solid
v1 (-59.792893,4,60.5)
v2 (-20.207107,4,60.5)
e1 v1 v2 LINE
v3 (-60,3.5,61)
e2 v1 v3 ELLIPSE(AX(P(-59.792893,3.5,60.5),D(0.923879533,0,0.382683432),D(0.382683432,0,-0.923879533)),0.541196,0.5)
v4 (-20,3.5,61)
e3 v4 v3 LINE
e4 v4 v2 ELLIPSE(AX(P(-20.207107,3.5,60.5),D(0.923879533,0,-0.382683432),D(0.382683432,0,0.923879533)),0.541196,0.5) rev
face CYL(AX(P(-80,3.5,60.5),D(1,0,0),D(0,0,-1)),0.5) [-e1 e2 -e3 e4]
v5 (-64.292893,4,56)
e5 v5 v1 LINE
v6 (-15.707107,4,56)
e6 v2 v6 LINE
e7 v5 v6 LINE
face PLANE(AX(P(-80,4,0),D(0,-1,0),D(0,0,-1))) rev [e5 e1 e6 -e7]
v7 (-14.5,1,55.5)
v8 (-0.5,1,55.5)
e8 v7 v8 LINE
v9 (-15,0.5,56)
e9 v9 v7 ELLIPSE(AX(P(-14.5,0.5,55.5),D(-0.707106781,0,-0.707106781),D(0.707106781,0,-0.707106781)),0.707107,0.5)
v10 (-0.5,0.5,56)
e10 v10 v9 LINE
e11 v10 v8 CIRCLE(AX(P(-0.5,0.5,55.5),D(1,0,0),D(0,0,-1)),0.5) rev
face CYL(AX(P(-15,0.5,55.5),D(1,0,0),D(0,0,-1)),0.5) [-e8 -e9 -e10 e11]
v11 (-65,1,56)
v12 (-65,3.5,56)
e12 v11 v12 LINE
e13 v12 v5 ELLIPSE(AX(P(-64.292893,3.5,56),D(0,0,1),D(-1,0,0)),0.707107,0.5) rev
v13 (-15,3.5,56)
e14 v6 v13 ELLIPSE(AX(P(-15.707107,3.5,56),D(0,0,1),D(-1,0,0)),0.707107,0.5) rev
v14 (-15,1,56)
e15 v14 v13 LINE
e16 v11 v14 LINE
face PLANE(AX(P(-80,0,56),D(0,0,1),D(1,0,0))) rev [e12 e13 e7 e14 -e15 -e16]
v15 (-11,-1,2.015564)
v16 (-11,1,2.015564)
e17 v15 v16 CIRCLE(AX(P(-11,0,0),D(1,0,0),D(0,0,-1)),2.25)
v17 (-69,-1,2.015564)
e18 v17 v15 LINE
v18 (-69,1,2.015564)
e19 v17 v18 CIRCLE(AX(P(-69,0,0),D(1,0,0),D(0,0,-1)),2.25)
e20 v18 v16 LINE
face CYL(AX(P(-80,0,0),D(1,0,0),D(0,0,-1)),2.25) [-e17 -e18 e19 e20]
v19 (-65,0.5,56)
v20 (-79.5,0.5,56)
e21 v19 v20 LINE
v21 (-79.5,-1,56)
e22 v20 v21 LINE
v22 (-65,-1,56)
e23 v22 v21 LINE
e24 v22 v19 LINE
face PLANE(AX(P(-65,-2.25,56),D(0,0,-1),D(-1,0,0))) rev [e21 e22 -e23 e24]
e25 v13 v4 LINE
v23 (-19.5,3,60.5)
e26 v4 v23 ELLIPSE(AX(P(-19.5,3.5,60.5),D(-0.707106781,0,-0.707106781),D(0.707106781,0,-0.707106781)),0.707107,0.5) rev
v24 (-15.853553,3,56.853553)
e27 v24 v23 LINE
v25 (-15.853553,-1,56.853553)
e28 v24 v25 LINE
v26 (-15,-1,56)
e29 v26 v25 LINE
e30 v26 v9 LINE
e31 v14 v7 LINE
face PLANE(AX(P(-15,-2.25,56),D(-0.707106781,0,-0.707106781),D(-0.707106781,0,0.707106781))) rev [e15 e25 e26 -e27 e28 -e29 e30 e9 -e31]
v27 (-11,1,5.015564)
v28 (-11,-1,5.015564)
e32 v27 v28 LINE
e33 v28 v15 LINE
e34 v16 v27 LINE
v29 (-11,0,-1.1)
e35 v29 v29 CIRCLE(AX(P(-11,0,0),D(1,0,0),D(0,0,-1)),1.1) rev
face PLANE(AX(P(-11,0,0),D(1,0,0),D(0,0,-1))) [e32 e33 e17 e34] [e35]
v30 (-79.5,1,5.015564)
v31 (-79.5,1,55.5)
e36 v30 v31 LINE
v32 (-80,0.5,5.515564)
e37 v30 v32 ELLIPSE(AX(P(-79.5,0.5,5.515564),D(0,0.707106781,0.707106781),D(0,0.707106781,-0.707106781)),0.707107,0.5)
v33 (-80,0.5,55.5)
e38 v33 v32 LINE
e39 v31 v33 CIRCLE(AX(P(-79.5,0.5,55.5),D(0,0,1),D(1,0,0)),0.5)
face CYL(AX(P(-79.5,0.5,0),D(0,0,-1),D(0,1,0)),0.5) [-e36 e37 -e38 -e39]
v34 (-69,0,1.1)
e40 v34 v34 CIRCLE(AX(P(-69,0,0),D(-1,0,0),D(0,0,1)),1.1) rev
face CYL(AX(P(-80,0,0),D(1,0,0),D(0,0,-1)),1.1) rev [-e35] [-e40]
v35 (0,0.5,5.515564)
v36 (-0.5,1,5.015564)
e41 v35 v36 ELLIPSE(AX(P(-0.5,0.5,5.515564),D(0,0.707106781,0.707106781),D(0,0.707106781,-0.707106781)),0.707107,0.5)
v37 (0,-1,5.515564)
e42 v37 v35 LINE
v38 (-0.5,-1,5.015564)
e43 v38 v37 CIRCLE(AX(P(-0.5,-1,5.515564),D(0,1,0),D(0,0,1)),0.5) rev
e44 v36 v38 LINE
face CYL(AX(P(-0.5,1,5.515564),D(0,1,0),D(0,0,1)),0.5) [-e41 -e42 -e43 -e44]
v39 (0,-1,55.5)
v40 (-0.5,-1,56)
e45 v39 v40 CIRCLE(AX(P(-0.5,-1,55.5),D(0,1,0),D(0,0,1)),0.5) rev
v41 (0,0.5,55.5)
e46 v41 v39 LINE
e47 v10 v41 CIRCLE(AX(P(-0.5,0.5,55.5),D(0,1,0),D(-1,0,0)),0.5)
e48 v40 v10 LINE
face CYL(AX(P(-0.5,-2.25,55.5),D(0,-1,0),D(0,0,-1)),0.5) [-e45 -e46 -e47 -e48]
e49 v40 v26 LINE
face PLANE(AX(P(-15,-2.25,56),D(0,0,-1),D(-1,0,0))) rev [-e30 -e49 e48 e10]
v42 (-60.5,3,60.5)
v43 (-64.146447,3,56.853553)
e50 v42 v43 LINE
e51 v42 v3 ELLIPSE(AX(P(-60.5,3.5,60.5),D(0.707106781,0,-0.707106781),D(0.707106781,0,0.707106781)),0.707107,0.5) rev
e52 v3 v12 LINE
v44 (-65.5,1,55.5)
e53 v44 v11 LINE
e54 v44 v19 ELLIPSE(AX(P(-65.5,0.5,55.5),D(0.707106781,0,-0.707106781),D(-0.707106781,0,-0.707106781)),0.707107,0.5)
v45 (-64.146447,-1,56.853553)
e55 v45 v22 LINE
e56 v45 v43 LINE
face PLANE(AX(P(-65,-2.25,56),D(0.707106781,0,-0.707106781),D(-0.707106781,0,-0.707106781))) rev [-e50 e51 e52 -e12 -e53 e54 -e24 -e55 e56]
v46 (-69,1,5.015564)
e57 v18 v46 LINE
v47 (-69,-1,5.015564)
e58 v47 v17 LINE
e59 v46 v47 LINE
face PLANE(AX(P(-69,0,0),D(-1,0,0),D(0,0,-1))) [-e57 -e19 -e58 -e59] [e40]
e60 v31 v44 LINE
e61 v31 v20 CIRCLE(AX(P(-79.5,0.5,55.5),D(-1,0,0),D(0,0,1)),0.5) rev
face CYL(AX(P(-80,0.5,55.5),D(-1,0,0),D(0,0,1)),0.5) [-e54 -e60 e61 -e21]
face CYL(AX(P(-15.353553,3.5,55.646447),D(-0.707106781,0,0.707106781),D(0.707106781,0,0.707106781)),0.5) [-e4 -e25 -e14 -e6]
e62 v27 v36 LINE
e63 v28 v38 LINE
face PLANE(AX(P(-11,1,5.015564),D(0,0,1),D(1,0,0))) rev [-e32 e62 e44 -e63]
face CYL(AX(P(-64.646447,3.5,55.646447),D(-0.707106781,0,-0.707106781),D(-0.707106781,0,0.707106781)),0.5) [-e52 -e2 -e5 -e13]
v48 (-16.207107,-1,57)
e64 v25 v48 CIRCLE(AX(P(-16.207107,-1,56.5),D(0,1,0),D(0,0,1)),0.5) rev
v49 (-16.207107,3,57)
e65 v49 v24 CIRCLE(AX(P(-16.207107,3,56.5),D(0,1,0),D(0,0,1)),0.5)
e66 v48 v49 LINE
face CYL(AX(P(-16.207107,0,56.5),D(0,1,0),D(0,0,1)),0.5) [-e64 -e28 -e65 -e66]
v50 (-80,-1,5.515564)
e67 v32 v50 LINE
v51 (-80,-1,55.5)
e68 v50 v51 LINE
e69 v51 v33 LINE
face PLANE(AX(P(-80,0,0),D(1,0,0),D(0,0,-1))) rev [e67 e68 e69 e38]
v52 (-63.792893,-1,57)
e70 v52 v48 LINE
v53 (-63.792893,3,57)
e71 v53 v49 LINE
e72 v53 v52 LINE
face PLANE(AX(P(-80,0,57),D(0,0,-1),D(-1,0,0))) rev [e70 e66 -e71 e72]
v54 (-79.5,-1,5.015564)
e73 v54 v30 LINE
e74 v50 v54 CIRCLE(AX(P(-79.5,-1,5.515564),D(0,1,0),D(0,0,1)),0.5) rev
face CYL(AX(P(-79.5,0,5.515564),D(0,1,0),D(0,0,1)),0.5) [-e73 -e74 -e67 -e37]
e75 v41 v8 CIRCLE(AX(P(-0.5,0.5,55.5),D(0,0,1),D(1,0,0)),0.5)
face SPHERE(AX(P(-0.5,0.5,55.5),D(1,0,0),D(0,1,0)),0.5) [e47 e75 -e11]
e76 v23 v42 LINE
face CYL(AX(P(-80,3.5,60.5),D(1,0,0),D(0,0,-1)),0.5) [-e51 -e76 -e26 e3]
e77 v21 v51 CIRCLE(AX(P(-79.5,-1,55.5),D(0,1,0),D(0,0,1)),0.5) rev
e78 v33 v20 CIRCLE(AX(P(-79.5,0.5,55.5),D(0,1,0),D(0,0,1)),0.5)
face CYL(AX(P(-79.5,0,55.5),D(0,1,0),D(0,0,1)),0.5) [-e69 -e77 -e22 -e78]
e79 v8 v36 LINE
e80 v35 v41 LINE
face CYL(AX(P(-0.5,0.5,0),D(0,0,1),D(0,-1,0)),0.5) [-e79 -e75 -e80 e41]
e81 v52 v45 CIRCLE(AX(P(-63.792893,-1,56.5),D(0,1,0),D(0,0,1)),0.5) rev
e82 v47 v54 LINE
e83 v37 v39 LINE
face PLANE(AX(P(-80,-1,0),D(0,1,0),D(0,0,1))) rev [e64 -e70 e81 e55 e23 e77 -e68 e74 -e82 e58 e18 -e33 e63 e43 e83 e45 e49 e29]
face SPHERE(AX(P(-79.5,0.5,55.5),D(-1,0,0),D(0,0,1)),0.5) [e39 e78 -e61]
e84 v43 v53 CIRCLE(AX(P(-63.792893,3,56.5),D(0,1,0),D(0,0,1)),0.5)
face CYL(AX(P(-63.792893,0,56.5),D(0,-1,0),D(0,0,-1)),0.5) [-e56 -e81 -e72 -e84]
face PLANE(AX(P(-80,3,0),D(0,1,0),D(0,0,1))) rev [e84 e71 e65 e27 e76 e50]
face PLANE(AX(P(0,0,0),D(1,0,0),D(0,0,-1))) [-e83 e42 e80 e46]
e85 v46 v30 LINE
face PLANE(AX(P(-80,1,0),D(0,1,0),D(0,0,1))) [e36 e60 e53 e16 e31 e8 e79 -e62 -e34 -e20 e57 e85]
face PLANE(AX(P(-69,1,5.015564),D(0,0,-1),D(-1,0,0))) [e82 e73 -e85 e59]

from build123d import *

# Parameters (mm, degrees)
SKETCH2_R           = 1.1
BOSS_EXTRUDE1_DEPTH = 80
CUT_EXTRUDE1_START  = 40
CUT_EXTRUDE1_DEPTH  = 11
CUT_EXTRUDE2_DEPTH  = 101.797135376
FILLET1_R           = 0.5


with BuildPart() as part:
    # Sketch2 → Boss-Extrude1 (new body)
    with BuildSketch(Plane(origin=(0, 0, 0), x_dir=(0, 0, -1), z_dir=(1, 0, 0))):
        with BuildLine():
            ThreePointArc((-2.015564437, -1), (2.25, 0), (-2.015564437, 1))
            Line((-2.015564437, 1), (-56, 1))
            Line((-56, 1), (-56, 4))
            Line((-56, 4), (-61, 4))
            Line((-61, 4), (-61, 3))
            Line((-61, 3), (-57, 3))
            Line((-57, 3), (-57, 1))
            Line((-57, 1), (-57, -1))
            Line((-57, -1), (-2.015564437, -1))
        make_face()
        Circle(SKETCH2_R, mode=Mode.SUBTRACT)
    extrude(amount=-BOSS_EXTRUDE1_DEPTH)

    # Sketch5 → Cut-Extrude1 (cut)
    with BuildSketch(Plane(origin=(-40, 0, 0), x_dir=(0, 0, -1), z_dir=(1, 0, 0)).offset(CUT_EXTRUDE1_START)):
        with BuildLine():
            Line((-2.015564437, 1), (-5.015564437, 1))
            Line((-5.015564437, 1), (-5.015564437, -1))
            Line((-5.015564437, -1), (-2.015564437, -1))
            ThreePointArc((-2.015564437, -1), (2.25, 0), (-2.015564437, 1))
        make_face()
    cut_extrude1 = extrude(amount=-CUT_EXTRUDE1_DEPTH, mode=Mode.SUBTRACT)

    # Mirror1: Cut-Extrude1 across plane
    add(cut_extrude1.mirror(Plane(origin=(-40, 0, 0), x_dir=(0, 0, 1), z_dir=(1, 0, 0))), mode=Mode.SUBTRACT)

    # Sketch6 → Cut-Extrude2 (cut, through all)
    with BuildSketch(Plane(origin=(0, 4, 0), x_dir=(1, 0, 0), z_dir=(0, 1, 0))):
        Polygon((-65, -56), (-60, -61), (-80, -61), (-80, -56), align=None)
        Polygon((-15, -56), (-20, -61), (0, -61), (0, -56), align=None)
    extrude(amount=-CUT_EXTRUDE2_DEPTH, mode=Mode.SUBTRACT)

    # Fillet1
    fillet1_edges = [part.edges().sort_by_distance(p)[0] for p in [
        (-17.5, 4, 58.5),
        (-62.5, 4, 58.5),
        (-40, 4, 61),
        (0, 0, 5.015564437),
        (0, 0, 56),
        (-80, 0, 5.015564437),
        (-80, 0, 56),
        (-40, 3, 61),
        (-16, 1, 57),
        (-64, 1, 57),
        (-72.5, 1, 56),
        (-7.5, 1, 56),
        (0, 1, 30.507782219),
        (-80, 1, 30.507782219),
    ]]
    fillet(fillet1_edges, radius=FILLET1_R - 0.0001)  # a hair under: the kernel refuses the full size


solid = part.part
